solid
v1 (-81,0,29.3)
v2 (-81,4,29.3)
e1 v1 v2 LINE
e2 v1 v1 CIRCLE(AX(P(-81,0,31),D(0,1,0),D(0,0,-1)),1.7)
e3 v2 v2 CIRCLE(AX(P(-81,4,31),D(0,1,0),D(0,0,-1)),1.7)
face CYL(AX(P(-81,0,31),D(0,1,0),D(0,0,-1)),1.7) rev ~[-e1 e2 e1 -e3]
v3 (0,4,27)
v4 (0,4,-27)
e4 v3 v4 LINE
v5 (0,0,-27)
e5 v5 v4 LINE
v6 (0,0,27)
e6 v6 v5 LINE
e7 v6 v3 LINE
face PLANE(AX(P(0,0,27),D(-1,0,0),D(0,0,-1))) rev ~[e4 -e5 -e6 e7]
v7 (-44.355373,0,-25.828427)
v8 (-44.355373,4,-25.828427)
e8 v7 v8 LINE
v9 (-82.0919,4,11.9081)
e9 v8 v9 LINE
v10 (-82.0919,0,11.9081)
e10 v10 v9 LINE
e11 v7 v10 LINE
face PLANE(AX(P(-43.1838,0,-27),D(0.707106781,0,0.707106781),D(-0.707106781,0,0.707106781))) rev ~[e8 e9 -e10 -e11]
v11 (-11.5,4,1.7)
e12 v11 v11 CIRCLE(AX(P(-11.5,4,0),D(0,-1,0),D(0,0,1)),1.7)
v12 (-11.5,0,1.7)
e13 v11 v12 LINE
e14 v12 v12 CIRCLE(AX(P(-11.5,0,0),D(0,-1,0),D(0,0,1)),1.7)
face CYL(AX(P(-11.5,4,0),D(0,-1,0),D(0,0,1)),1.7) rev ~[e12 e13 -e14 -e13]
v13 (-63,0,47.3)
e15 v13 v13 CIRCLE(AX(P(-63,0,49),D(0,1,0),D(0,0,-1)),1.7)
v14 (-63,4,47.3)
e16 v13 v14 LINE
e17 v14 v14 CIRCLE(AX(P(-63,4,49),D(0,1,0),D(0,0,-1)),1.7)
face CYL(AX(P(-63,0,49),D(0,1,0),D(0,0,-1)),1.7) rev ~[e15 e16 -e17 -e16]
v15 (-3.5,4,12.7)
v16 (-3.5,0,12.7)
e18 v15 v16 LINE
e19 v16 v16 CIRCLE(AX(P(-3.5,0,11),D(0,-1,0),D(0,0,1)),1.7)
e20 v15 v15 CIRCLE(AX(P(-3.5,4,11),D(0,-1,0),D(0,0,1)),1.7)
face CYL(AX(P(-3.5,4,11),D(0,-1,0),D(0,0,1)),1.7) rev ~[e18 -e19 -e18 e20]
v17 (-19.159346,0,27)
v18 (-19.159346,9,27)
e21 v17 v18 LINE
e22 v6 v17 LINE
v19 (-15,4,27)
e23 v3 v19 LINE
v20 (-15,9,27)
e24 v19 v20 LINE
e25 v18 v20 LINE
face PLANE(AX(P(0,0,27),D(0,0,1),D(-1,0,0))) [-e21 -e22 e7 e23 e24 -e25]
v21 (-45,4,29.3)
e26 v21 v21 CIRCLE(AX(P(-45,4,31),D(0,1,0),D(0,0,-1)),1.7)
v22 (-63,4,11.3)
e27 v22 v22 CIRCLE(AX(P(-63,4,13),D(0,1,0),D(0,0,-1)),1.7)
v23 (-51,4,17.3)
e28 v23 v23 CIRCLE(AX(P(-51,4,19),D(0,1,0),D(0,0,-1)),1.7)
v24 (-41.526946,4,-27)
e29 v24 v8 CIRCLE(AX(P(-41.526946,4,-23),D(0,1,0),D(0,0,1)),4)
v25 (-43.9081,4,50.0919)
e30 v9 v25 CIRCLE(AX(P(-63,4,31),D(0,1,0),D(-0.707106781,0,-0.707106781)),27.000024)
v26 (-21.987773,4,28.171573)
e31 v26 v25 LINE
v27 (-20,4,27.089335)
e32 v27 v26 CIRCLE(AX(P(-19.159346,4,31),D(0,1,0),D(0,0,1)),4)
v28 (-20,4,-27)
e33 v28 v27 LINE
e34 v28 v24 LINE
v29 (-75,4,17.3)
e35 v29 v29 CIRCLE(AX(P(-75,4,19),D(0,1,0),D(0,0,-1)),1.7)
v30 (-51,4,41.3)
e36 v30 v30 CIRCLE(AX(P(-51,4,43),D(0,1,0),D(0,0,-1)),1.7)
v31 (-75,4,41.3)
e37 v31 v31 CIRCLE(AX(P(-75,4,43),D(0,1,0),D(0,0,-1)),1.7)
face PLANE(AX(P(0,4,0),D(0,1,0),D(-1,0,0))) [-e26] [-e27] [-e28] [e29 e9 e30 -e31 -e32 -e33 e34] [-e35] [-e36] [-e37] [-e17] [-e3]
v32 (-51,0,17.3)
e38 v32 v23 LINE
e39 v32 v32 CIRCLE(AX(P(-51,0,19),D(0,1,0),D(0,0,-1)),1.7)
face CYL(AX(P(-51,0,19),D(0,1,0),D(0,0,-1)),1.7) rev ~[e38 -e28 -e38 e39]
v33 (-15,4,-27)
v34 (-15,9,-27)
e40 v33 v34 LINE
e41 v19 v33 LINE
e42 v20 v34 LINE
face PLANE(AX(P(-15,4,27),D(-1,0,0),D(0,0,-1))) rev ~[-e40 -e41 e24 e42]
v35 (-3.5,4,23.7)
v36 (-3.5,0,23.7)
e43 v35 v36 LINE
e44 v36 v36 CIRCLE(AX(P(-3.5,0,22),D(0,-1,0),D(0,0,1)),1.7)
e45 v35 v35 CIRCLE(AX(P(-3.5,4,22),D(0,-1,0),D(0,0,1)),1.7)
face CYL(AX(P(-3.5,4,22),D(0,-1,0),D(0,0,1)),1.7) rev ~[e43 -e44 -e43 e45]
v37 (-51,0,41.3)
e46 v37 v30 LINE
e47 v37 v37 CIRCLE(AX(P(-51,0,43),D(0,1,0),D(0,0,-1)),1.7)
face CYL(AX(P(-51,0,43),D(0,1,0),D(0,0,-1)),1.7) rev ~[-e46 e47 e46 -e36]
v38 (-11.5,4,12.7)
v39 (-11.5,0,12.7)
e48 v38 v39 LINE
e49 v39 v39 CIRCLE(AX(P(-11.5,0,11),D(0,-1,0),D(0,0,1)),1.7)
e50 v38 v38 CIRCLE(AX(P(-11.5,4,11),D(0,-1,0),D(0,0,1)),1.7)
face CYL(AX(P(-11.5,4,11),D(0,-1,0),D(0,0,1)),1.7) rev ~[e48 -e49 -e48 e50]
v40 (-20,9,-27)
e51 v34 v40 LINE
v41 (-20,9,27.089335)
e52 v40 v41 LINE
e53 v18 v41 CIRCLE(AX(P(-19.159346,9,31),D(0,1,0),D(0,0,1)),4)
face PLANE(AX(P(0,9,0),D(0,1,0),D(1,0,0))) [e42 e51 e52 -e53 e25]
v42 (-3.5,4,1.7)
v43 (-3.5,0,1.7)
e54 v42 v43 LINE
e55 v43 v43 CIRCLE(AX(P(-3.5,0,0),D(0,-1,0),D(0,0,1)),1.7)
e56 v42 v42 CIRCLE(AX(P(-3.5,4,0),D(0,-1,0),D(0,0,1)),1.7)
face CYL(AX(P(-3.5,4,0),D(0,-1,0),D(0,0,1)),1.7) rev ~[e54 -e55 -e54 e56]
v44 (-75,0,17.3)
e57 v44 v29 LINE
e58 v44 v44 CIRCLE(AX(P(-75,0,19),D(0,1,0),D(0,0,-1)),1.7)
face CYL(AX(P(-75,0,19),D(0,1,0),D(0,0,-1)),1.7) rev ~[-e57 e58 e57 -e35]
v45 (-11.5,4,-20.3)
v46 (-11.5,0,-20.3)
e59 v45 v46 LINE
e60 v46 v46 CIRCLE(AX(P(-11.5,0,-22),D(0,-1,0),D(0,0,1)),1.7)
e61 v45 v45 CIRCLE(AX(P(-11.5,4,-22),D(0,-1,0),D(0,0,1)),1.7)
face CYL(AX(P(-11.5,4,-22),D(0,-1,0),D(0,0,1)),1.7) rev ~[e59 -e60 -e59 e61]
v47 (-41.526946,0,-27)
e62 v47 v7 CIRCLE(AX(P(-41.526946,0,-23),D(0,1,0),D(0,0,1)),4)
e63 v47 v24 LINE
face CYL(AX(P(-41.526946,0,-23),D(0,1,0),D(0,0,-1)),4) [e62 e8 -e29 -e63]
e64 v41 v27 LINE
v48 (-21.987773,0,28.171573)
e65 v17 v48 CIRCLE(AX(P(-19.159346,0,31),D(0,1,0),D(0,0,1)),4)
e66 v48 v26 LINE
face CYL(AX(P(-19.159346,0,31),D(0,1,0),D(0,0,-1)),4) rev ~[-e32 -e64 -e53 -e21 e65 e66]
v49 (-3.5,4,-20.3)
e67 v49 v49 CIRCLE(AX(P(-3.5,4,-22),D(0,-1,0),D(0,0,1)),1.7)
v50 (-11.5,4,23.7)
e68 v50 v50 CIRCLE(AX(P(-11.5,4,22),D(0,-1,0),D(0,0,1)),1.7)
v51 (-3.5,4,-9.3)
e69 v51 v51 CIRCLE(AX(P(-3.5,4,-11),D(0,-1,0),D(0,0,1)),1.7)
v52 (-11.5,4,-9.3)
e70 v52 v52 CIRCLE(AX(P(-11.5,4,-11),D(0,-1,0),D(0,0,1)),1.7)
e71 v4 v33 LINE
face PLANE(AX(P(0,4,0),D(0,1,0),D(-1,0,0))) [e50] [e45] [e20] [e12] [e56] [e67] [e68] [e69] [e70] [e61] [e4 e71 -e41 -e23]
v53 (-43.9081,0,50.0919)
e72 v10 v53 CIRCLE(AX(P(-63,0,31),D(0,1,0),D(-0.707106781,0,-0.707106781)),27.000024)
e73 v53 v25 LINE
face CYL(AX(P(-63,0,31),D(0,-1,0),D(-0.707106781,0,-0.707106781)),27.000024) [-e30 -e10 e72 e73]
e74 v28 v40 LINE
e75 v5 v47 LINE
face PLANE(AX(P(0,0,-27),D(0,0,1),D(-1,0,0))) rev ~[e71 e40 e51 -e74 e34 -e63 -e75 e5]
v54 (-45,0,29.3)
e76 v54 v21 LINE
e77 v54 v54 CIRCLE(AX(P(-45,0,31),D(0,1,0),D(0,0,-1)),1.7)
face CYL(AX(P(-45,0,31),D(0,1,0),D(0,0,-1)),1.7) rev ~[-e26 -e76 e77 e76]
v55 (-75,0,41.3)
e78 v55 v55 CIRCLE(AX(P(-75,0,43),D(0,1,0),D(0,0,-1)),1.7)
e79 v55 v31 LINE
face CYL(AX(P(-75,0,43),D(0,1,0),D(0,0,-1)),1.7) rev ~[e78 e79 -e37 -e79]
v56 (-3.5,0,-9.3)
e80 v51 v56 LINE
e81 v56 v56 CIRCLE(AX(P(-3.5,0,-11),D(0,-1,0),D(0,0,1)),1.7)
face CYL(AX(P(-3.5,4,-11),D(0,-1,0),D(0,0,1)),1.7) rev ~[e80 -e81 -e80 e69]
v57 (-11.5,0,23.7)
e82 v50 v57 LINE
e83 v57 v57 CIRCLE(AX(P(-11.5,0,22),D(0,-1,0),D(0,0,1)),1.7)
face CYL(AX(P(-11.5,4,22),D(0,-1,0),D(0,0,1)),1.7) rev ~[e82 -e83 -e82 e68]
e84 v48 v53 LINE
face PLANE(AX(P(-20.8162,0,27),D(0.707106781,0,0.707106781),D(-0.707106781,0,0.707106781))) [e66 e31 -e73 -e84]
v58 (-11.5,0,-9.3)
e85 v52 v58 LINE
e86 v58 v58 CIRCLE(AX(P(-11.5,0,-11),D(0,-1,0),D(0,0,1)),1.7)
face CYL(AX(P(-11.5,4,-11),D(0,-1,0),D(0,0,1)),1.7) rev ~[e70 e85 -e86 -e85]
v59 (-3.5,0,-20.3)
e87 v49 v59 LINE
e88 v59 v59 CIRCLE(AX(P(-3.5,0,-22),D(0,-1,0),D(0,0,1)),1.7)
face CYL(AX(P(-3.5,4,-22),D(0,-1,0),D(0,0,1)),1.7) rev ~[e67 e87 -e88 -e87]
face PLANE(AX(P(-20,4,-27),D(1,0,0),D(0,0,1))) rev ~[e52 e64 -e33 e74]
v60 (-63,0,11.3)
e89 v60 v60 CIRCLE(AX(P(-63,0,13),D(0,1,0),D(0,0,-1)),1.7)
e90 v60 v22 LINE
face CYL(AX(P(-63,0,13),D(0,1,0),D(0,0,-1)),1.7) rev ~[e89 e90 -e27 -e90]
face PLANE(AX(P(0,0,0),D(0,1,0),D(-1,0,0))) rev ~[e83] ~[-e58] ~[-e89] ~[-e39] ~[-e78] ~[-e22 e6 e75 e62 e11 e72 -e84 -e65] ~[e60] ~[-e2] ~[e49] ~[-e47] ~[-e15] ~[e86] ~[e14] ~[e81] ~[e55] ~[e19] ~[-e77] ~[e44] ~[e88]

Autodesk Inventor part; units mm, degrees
ref_plane "YZ Plane" through (0, 0, 0) normal (1, 0, 0) x (0, 1, 0)
ref_plane "XZ Plane" through (0, 0, 0) normal (0, 1, 0) x (-1, 0, 0)
ref_plane "XY Plane" through (0, 0, 0) normal (0, 0, 1) x (1, 0, 0)
sketch "Skizze1" plane through (0, 0, 0) normal (0, 1, 0) x (-1, 0, 0)
  line L0 (0, 27) -> (0, -27)
  line L1 (0, 27) -> (20.8162, 27)
  line L2 (20.8162, 27) -> (43.9081, 50.0919)
  line L3 (0, -27) -> (43.1838, -27)
  line L4 (43.1838, -27) -> (82.0919, 11.9081)
  arc A0 (82.0919, 11.9081) -> (43.9081, 50.0919) centre (63, 31) ccw
  point P0 (0, 0)
  point P1 (0, 0)
  dimension "d43" = 54
  dimension "d44" = 135
  dimension "d46" = 31
  dimension "d47" = 63
  dimension "d48" = 54
extrude "Extrusion1" add sketch "Skizze1" along normal blind 4
sketch "Skizze5" plane through (0, 4, 0) normal (0, 1, 0) x (1, 0, 0)
  line L0 (0, -27) -> (0, 27) projected
  line L1 (0, 27) -> (-43.1838, 27) projected
  line L2 (-43.1838, 27) -> (-82.0919, -11.9081) projected
  arc A0 (-82.0919, -11.9081) -> (-43.9081, -50.0919) centre (-63, -31) ccw projected
  line L3 (-43.9081, -50.0919) -> (-20.8162, -27) projected
  line L4 (-20.8162, -27) -> (0, -27) projected
  line L5 (-20, -27) -> (-15, -27)
  line L6 (-15, -27) -> (-15, 27)
  line L7 (-15, 27) -> (-20, 27)
  line L8 (-20, 27) -> (-20, -27)
  dimension "d49" = 5
  dimension "d50" = 15
extrude "Extrusion4" add sketch "Skizze5" along normal blind 5 contours L4 L8 L1 L6
sketch "Skizze6" plane through (0, 4, 0) normal (0, 1, 0) x (1, 0, 0)
  point P0 (0, 0)
  point P1 (-3.5, 0)
  dimension "d51" = 3.5
hole "Bohrung1" at (-3.5, 4, 0) direction (0, -1, 0) diameter 3.4 end through all clearance for "Inbusschraube ISO 4762" size "M3" standard "ISO"
pattern_linear "Rechteckige Anordnung1" count 5 spacing 11 along (0, 0, -1) count 2 spacing 8 along (-1, 0, 0) of "Bohrung1" first direction both ways yes
sketch "Skizze7" plane through (0, 0, 0) normal (0, -1, 0) x (1, 0, 0)
  line L0 (-51, 43) -> (-75, 43)
  line L1 (-75, 43) -> (-75, 19)
  line L2 (-75, 19) -> (-51, 19)
  line L3 (-51, 19) -> (-51, 43)
  line L4 (-51, 43) -> (-75, 19) construction
  line L5 (-63, 63.2011) -> (-63, 8.0055) construction
  circle A0 centre (-63, 31) radius 18
  line L6 (-63, 26.0548) -> (-63, -18.8231) construction
  line L7 (-38.3888, 31) -> (-81.0377, 31) construction
  arc A1 (-43.9081, 50.0919) -> (-82.0919, 11.9081) centre (-63, 31) ccw projected
  line L8 (-51, 19) -> (-75, 43) construction
  point P0 (-63, 13)
  point P1 (-81, 31)
  point P2 (-63, 13)
  point P3 (-63, 31)
  point P4 (-45, 31)
  point P5 (-63, 49)
  dimension "d32" = 24
  dimension "d33" = 24
  dimension "d35" = 36
hole "Bohrung2" at (-63, 0, 13) at (-81, 0, 31) at (-51, 0, 19) at (-75, 0, 19) at (-75, 0, 43) at (-51, 0, 43) at (-63, 0, 49) at (-45, 0, 31) direction (0, 1, 0) diameter 3.4 end through all clearance for "Inbusschraube ISO 4762" size "M3" standard "ISO"
fillet "Rundung1" radius 4 2 edges at (-43.1838, 2, -27) (-20.8162, 2, 27)
equation "\"d48\" = d43"
properties part number "dynamixel_pro_frame_part3" material "Aluminium 6061"
